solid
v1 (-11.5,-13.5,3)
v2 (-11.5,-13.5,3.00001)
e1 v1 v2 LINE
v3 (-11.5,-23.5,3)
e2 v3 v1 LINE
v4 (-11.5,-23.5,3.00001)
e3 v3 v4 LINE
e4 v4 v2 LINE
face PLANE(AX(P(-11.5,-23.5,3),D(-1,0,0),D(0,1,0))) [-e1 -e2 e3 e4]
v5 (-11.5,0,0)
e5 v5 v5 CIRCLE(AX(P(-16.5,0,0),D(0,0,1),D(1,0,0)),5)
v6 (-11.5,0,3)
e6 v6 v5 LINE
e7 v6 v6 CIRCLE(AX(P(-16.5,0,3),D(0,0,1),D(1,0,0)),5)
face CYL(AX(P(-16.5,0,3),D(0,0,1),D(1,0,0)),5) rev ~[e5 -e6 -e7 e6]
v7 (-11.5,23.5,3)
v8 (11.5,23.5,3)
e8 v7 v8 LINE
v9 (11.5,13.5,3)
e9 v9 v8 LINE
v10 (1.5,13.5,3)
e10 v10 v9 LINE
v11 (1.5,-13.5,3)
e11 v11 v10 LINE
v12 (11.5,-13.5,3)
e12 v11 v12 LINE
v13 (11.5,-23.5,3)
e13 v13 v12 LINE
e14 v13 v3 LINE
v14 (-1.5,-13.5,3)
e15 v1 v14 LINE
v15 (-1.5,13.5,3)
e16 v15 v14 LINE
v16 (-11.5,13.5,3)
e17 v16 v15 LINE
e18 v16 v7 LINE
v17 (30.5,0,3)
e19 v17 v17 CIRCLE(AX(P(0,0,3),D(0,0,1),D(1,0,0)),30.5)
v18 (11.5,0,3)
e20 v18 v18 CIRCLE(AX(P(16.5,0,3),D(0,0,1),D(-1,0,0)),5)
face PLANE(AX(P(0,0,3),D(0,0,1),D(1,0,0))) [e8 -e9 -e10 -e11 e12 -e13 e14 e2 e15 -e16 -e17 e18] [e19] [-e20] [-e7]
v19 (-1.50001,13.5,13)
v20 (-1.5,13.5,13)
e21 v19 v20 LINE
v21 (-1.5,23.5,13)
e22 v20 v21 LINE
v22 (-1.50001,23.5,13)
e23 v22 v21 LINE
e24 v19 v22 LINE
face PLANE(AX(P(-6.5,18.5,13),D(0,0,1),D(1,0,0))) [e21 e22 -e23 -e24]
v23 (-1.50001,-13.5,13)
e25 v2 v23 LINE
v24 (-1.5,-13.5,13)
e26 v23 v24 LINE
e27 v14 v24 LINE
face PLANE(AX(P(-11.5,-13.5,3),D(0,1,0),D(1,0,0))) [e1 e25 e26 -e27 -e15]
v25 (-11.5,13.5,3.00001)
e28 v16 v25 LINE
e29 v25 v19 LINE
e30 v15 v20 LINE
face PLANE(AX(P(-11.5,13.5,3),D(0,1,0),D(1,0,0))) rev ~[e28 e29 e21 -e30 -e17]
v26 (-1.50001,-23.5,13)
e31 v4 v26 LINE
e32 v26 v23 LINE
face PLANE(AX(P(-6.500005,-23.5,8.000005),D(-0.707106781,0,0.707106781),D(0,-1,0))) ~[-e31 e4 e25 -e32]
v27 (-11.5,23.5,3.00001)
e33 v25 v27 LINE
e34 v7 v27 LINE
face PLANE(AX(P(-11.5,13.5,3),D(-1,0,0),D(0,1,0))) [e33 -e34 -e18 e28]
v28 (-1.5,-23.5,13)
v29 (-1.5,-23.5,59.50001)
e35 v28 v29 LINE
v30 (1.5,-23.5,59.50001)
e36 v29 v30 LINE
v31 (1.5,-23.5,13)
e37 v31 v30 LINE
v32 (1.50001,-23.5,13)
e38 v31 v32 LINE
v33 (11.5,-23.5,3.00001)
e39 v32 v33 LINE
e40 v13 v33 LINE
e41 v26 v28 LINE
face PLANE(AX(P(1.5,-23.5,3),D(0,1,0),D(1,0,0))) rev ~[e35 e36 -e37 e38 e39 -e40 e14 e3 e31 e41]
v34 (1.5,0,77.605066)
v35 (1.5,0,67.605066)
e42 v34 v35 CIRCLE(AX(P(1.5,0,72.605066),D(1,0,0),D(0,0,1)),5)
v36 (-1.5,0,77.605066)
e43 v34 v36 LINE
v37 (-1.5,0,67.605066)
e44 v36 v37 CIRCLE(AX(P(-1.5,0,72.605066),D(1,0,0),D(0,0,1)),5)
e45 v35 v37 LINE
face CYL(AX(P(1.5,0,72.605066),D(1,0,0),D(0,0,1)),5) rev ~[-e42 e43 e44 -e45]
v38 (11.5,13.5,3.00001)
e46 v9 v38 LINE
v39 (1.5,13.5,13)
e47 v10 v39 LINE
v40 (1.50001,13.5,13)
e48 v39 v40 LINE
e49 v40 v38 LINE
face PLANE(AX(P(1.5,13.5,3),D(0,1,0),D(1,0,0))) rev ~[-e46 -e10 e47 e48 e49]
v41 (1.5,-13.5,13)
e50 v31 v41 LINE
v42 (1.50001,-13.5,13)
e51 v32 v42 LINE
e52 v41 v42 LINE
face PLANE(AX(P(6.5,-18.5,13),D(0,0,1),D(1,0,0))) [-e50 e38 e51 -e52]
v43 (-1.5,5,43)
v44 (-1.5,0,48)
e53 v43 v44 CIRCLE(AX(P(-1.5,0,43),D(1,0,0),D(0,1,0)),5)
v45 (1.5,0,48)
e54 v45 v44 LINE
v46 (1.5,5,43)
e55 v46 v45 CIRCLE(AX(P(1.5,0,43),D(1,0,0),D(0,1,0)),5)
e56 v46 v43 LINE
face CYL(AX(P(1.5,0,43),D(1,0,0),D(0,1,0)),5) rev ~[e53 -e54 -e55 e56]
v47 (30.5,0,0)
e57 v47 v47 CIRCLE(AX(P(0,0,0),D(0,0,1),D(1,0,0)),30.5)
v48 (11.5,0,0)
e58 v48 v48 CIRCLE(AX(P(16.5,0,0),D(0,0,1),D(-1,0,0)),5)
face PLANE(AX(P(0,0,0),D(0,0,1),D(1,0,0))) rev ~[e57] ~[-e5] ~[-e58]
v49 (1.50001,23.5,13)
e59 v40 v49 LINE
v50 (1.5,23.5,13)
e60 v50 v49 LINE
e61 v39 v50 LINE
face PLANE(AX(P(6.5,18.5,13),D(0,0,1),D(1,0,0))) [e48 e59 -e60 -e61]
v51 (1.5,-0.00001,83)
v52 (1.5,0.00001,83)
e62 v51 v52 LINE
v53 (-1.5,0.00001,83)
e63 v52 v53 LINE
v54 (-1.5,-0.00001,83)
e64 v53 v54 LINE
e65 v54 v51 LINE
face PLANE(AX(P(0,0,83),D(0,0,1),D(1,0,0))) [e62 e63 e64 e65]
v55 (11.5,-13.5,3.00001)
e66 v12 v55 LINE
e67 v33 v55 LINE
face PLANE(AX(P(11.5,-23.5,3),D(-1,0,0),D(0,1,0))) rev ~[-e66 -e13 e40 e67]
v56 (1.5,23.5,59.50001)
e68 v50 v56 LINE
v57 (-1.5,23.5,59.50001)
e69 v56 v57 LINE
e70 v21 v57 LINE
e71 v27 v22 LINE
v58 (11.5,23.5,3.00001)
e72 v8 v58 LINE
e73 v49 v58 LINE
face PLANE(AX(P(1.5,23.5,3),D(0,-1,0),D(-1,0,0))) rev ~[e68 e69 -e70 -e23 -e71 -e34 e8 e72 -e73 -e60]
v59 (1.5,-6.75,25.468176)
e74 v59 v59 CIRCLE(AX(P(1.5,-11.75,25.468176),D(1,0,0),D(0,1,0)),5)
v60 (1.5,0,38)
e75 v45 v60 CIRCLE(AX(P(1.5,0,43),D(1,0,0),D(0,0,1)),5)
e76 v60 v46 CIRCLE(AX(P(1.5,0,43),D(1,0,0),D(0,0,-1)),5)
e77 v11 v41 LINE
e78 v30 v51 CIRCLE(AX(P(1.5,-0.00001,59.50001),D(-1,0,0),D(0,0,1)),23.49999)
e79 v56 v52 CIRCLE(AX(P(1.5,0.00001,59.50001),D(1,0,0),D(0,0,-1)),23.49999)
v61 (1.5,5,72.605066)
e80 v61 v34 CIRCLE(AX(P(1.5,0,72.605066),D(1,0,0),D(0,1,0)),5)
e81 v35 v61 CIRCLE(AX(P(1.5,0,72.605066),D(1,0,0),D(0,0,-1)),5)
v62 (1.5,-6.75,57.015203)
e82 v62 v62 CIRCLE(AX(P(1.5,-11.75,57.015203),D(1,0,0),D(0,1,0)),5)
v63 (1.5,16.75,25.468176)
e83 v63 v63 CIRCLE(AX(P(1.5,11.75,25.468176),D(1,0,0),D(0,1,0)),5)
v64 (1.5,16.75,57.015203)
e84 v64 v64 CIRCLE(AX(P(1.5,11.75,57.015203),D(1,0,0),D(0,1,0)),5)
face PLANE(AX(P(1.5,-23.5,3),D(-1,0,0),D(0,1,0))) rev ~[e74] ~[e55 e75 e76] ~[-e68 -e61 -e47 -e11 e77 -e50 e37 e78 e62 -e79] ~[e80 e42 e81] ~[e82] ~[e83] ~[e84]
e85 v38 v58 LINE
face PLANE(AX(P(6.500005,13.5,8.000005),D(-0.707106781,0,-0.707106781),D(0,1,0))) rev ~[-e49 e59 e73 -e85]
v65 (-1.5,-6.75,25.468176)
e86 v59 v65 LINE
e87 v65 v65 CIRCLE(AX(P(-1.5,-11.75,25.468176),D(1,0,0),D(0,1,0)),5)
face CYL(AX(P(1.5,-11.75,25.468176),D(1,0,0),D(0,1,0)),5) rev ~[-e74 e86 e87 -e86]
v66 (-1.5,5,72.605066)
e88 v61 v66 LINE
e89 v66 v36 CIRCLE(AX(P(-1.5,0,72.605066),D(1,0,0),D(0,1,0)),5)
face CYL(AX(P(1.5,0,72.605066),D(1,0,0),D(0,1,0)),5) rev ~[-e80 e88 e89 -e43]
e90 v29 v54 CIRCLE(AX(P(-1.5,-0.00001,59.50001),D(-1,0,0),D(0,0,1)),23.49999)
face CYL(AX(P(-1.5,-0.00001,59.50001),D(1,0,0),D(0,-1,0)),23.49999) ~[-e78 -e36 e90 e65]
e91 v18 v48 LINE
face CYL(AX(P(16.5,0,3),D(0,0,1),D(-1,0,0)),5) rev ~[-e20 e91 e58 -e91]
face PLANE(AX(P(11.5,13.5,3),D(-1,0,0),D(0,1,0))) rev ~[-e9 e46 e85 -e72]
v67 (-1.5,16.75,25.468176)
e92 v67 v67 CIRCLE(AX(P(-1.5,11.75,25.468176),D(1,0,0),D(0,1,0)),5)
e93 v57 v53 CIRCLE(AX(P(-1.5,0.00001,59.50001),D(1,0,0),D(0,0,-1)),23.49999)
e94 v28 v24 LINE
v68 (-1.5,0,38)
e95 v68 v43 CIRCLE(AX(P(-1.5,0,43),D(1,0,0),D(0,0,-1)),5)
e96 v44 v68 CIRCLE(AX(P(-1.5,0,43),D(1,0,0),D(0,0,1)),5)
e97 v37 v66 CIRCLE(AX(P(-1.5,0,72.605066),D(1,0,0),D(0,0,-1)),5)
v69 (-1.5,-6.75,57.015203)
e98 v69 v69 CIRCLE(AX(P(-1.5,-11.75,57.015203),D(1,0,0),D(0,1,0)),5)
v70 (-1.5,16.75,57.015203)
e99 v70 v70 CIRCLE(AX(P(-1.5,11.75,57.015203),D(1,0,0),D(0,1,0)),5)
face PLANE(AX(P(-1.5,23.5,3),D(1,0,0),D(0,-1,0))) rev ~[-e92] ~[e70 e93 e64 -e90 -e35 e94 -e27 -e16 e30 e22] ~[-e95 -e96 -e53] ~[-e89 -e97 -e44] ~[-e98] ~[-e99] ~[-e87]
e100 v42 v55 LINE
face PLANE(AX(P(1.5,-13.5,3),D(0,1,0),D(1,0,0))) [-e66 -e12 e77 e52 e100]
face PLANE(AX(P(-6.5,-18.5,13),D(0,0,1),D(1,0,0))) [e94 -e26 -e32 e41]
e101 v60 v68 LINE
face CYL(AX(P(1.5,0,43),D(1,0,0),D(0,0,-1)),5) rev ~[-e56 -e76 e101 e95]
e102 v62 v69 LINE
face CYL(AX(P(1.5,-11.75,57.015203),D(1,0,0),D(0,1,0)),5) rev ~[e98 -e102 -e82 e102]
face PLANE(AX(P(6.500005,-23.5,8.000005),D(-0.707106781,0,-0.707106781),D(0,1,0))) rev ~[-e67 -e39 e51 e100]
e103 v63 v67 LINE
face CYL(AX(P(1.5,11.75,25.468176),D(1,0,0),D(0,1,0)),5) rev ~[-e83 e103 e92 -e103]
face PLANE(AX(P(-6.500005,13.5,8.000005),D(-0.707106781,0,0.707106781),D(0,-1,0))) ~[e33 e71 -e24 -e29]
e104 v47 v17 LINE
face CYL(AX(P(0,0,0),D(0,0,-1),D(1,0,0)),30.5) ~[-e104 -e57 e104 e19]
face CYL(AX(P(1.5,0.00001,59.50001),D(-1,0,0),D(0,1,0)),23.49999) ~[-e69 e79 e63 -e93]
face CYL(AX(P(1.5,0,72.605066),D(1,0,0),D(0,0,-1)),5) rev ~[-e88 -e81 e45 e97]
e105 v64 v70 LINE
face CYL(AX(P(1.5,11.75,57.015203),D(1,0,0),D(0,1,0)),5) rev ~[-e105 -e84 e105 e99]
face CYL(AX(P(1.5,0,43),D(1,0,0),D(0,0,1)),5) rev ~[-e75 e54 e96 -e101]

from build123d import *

# Parameters (mm, degrees)
F0_R      = 30.5
F1_DEPTH  = 3
F3_DEPTH  = 80
F4_R      = 23.49999
F5_W      = 10
F5_H      = 10
F6_DEPTH  = 10
F7_SIZE   = 9.99999
F8_W      = 10
F8_H      = 10
F9_DEPTH  = 10
F10_SIZE  = 9.99999
F11_R     = 5
F12_DEPTH = 3
F13_R     = 5
F14_DEPTH = 3


# Not quite as in the source:
# - a fillet or chamfer is up to 0.001 mm smaller than in the source, because OpenCascade refuses the exact size


with BuildPart() as f1:
    # F0 (on Top) → F1 (new body)
    with BuildSketch(Plane.XY):
        Circle(F0_R)
    extrude(amount=F1_DEPTH)

    # F2 (on face) → F3 (join)
    with BuildSketch(Plane.XY.offset(3)):
        Polygon((1.5, 23.5), (0, 23.5), (-1.5, 23.5), (-1.5, 0), (-1.5, -23.5), (0, -23.5), (1.5, -23.5), (1.5, 0), align=None)
    extrude(amount=F3_DEPTH)

    # F4 (radius 23.5 in the source; OpenCascade refuses exactly that, so slightly less here)
    f4_edges = [f1.edges().sort_by_distance(p)[0] for p in [
        (0, 23.5, 83),
        (0, -23.5, 83),
    ]]
    fillet(f4_edges, radius=F4_R)

    # F5 (on face) → F6 (join)
    with BuildSketch(Plane.XY.offset(3)):
        with Locations((6.5, -18.5)):
            Rectangle(F5_W, F5_H)
    extrude(amount=F6_DEPTH)

    # F7 (size 10 in the source; OpenCascade refuses exactly that, so slightly less here)
    f7_edges = [f1.edges().sort_by_distance(p)[0] for p in [
        (11.5, -18.5, 13),
    ]]
    chamfer(f7_edges, length=F7_SIZE)

    # F8 (on face) → F9 (join)
    with BuildSketch(Plane.XY.offset(3)):
        with Locations((6.5, 18.5)):
            Rectangle(F8_W, F8_H)
        with Locations((-6.5, 18.5)):
            Rectangle(F8_W, F8_H)
        with Locations((-6.5, -18.5)):
            Rectangle(F8_W, F8_H)
    extrude(amount=F9_DEPTH)

    # F10 (size 10 in the source; OpenCascade refuses exactly that, so slightly less here)
    f10_edges = [f1.edges().sort_by_distance(p)[0] for p in [
        (11.5, 18.5, 13),
        (-11.5, 18.5, 13),
        (-11.5, -18.5, 13),
    ]]
    chamfer(f10_edges, length=F10_SIZE)

    # F11 (on face) → F12 (cut)
    with BuildSketch(Plane.XY.offset(3)):
        with BuildLine():
            ThreePointArc((21.5, 0), (16.5, 5), (11.5, 0))
            ThreePointArc((11.5, 0), (16.5, -5), (21.5, 0))
        make_face()
        with Locations((-16.5, 0)):
            Circle(F11_R)
    extrude(amount=-F12_DEPTH, mode=Mode.SUBTRACT)

    # F13 (on face) → F14 (cut)
    with BuildSketch(Plane.YZ.offset(1.5)):
        with BuildLine():
            ThreePointArc((0, 77.6050660014), (-5, 72.6050660014), (0, 67.6050660014))
            ThreePointArc((0, 67.6050660014), (3.5355339059, 69.0695320955), (5, 72.6050660014))
            ThreePointArc((5, 72.6050660014), (3.5355339059, 76.1405999073), (0, 77.6050660014))
        make_face()
        with Locations((11.75, 57.0152029395)):
            Circle(F13_R)
        with BuildLine():
            ThreePointArc((0, 48), (-5, 43), (0, 38))
            ThreePointArc((0, 38), (3.5355339059, 39.4644660941), (5, 43))
            ThreePointArc((5, 43), (3.5355339059, 46.5355339059), (0, 48))
        make_face()
        with Locations((-11.75, 57.0152029395)):
            Circle(F13_R)
        with Locations((-11.75, 25.4681762308)):
            Circle(F13_R)
        with Locations((11.75, 25.4681762308)):
            Circle(F13_R)
    extrude(amount=-F14_DEPTH, mode=Mode.SUBTRACT)


solid = f1.part
